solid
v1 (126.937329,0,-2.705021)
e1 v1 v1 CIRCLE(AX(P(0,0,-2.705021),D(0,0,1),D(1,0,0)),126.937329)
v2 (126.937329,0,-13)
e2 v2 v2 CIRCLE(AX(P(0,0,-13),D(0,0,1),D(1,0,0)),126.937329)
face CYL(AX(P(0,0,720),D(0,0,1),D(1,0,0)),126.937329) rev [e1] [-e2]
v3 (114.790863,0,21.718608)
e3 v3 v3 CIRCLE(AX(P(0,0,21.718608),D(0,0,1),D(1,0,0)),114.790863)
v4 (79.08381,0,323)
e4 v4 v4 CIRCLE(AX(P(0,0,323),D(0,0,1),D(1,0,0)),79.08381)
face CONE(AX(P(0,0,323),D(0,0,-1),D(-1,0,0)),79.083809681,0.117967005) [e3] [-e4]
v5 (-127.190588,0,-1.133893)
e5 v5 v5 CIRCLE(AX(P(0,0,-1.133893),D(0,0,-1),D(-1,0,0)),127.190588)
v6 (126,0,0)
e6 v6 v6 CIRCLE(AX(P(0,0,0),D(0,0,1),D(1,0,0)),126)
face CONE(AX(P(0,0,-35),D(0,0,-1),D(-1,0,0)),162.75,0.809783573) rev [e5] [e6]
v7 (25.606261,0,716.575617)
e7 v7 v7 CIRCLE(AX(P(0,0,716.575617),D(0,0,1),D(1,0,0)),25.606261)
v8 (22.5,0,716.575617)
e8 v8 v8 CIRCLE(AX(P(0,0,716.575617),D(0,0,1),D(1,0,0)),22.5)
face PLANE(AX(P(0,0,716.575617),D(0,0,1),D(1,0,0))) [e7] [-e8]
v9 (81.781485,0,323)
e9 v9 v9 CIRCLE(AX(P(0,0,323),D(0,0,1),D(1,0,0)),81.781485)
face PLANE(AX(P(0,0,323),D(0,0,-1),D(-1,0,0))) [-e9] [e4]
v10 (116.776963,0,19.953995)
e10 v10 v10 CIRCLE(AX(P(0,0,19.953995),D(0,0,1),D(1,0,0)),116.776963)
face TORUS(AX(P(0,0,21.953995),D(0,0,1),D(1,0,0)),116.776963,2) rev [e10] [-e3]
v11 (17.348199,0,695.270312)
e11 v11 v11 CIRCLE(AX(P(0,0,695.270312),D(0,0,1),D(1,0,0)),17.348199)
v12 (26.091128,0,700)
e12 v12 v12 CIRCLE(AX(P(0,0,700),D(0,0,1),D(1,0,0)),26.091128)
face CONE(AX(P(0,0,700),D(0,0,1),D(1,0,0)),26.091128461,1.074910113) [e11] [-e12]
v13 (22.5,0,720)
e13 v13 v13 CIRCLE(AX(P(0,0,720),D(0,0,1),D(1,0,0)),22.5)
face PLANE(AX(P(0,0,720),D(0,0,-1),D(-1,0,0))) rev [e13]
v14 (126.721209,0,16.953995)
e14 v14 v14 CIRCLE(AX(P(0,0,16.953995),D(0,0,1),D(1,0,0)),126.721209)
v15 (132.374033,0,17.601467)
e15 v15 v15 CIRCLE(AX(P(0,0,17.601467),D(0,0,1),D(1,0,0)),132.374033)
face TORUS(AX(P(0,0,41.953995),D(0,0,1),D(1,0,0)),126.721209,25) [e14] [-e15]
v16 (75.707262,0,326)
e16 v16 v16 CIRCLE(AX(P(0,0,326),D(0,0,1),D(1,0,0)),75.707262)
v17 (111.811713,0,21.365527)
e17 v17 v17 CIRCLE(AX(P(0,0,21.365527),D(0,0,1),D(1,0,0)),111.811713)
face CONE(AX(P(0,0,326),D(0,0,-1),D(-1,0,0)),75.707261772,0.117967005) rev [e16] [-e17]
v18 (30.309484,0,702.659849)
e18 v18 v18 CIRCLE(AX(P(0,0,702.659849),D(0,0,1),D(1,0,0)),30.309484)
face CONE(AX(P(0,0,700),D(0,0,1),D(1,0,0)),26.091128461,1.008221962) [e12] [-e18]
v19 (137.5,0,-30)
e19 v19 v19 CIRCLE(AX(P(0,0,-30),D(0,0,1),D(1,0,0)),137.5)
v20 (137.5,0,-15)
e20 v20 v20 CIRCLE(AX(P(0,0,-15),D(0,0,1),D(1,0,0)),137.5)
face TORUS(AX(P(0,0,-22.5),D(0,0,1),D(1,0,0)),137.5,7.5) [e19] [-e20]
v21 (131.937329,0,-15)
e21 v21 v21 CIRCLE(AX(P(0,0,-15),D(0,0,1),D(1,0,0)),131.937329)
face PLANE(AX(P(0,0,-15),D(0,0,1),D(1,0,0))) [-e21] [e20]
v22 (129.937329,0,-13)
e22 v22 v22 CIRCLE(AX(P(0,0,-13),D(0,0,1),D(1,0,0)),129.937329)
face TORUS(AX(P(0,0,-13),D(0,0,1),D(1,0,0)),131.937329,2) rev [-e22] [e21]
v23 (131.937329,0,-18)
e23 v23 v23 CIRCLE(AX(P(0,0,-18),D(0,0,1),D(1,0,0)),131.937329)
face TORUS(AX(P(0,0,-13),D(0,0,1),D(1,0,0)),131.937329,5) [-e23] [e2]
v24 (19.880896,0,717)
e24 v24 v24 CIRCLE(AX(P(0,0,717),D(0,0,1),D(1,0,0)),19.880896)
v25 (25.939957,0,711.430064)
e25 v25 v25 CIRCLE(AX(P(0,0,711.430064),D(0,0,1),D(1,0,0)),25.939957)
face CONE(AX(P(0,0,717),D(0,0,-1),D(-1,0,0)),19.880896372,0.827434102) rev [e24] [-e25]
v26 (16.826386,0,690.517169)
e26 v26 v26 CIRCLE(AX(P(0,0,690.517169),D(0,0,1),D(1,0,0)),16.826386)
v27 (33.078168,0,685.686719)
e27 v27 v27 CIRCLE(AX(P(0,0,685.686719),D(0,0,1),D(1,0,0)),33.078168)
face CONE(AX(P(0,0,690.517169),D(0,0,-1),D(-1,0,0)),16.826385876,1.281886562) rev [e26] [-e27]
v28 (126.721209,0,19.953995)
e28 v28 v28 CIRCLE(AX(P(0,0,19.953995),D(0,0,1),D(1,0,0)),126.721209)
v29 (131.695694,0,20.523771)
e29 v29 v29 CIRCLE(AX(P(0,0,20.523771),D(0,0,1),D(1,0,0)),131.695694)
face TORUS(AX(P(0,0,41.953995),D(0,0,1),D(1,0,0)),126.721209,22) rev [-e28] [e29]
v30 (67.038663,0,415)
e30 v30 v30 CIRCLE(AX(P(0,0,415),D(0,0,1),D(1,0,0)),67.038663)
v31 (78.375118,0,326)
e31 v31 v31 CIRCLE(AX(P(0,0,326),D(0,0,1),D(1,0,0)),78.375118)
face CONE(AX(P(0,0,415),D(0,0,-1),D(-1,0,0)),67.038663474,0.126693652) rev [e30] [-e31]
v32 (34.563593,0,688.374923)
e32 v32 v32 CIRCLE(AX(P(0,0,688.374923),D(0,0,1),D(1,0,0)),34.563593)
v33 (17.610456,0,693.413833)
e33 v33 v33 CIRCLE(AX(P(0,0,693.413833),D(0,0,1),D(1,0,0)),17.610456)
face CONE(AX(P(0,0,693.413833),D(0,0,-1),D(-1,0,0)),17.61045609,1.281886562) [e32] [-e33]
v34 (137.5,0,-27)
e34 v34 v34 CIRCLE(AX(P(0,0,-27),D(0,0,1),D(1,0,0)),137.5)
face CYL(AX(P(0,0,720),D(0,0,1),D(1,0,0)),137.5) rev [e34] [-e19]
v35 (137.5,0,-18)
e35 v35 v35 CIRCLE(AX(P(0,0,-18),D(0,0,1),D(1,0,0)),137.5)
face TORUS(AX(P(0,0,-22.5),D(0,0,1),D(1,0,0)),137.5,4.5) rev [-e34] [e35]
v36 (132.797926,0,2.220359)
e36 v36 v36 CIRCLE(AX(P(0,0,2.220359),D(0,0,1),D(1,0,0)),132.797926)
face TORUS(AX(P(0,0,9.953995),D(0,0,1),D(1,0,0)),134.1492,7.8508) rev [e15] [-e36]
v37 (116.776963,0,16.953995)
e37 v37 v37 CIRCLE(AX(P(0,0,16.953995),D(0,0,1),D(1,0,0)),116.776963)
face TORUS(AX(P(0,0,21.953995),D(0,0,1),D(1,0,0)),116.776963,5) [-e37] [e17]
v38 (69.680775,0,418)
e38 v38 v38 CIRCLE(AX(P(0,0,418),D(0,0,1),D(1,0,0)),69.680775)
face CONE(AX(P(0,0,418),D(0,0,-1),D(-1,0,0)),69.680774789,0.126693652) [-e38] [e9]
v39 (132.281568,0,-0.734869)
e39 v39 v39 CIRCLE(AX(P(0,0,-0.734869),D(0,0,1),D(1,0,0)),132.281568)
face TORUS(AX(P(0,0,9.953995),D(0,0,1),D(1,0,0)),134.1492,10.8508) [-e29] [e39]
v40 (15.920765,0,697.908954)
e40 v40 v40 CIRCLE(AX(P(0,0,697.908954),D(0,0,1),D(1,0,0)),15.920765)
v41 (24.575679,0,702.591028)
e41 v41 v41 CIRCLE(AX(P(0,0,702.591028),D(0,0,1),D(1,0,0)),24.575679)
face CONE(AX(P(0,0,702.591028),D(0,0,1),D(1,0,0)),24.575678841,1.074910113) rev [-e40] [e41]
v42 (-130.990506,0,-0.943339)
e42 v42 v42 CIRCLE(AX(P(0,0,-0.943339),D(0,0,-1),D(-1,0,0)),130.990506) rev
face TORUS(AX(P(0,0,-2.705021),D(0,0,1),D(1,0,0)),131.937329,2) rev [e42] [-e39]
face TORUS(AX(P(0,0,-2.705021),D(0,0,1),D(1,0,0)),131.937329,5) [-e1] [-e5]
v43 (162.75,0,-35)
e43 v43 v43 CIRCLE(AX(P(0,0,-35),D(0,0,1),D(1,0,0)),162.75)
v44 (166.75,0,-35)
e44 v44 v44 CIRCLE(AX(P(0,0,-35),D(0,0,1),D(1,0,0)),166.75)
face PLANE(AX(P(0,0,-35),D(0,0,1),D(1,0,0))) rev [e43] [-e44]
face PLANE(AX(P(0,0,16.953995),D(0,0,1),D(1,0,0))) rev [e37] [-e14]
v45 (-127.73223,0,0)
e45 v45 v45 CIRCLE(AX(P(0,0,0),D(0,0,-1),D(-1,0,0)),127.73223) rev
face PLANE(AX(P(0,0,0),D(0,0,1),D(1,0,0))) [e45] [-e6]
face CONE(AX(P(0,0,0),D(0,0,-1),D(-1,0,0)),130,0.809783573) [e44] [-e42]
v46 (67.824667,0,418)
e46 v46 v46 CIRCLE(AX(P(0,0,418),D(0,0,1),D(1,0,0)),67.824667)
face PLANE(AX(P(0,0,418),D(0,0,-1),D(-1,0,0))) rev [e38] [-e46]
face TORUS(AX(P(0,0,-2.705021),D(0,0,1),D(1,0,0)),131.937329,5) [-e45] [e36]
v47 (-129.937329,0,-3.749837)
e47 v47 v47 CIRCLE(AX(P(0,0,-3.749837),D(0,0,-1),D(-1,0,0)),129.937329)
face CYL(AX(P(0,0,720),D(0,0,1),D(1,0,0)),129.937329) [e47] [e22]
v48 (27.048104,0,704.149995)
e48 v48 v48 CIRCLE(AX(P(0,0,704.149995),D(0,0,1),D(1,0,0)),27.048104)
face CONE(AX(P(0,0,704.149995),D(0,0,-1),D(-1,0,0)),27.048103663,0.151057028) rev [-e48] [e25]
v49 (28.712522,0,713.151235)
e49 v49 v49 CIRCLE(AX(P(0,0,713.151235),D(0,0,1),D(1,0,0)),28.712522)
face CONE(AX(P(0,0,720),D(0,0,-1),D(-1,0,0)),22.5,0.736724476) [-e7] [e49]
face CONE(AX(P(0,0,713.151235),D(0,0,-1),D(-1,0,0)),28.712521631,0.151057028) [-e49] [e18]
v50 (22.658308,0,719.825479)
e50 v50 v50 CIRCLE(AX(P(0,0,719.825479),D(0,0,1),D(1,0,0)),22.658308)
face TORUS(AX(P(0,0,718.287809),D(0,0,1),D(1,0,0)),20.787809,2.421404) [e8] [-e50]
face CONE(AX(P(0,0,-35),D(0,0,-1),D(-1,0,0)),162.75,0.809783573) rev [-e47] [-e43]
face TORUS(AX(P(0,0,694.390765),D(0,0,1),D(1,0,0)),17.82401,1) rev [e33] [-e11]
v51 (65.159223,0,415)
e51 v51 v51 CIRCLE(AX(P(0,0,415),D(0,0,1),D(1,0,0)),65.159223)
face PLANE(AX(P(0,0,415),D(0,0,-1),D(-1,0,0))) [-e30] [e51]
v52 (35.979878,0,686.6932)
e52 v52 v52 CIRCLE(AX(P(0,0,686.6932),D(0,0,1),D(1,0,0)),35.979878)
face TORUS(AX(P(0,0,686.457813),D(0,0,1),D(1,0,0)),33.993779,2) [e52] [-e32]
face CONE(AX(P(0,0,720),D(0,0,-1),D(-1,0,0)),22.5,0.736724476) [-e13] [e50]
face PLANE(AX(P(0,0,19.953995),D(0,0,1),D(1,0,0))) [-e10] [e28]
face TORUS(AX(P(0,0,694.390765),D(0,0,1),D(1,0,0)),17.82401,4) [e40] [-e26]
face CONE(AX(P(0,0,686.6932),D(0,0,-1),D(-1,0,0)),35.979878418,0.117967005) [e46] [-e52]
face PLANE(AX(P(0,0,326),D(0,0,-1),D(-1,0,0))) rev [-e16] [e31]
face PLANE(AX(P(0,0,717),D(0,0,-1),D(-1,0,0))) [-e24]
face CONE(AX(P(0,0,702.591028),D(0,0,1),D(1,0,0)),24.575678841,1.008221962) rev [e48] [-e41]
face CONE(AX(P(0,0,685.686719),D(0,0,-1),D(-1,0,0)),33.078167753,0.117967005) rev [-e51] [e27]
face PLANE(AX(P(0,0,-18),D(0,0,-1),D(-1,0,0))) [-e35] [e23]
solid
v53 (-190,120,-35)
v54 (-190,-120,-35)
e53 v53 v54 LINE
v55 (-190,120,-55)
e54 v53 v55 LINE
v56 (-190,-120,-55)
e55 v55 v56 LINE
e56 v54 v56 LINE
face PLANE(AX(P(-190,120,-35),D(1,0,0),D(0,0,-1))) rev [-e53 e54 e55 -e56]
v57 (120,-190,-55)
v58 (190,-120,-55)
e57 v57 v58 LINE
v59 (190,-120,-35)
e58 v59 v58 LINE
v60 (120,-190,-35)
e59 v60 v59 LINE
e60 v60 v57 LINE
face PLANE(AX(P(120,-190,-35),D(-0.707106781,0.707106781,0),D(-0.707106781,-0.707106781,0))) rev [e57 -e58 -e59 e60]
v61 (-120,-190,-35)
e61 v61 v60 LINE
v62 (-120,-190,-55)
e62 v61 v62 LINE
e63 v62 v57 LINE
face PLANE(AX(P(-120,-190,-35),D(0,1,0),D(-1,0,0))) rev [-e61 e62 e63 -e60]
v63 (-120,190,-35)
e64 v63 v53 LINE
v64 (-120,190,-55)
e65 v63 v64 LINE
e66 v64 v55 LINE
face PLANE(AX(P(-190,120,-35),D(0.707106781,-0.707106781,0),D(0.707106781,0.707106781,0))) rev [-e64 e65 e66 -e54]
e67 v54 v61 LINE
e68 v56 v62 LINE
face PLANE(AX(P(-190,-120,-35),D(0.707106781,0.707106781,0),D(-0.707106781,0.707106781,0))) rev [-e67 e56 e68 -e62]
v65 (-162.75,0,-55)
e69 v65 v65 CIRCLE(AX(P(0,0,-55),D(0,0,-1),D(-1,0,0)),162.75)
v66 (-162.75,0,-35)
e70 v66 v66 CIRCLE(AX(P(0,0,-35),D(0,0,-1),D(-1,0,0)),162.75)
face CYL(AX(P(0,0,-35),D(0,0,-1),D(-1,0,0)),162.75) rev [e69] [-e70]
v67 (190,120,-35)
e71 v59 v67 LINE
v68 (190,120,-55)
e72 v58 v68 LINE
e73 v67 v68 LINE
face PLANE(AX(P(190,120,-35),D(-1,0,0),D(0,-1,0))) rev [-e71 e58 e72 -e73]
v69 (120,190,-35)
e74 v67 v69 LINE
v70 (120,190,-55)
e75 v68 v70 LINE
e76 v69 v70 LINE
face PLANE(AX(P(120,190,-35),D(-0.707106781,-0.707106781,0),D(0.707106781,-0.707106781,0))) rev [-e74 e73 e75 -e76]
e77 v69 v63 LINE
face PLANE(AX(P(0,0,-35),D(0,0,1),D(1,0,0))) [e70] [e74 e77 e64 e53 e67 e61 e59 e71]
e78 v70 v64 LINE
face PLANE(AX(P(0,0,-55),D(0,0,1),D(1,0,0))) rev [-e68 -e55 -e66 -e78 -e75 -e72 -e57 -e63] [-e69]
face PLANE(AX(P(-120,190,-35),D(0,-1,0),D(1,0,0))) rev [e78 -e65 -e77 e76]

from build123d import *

# Parameters (mm, degrees)
BOSS_EXTRUDE2_START = -55
BOSS_EXTRUDE2_DEPTH = 20
SKETCH3_R           = 130
CUT_EXTRUDE1_DEPTH  = 20
SKETCH9_R           = 162.75
CUT_EXTRUDE3_DEPTH  = 20


# Read off the part's stored shape, not the designer's step: Loft3
with BuildPart() as part:
    # Sketch1 → Boss-Extrude2 (new body)
    with BuildSketch(Plane.XY.offset(BOSS_EXTRUDE2_START)):
        Polygon((-190, -120), (-120, -190), (120, -190), (190, -120), (190, 120), (120, 190), (-120, 190), (-190, 120), align=None)
    extrude(amount=BOSS_EXTRUDE2_DEPTH)

    # Sketch3 → Cut-Extrude1 (cut)
    with BuildSketch(Plane.XY.offset(-35)):
        Circle(SKETCH3_R)
    extrude(amount=-CUT_EXTRUDE1_DEPTH, mode=Mode.SUBTRACT)

    # Sketch9 → Cut-Extrude3 (cut)
    with BuildSketch(Plane(origin=(0, 0, -55), x_dir=(-1, 0, 0), z_dir=(0, 0, -1))):
        Circle(SKETCH9_R)
    extrude(amount=-CUT_EXTRUDE3_DEPTH, mode=Mode.SUBTRACT)


with BuildPart() as body_2:
    # Loft3 outline → Loft3 (revolve)
    with BuildSketch(Plane.XZ):
        Polygon((0, 0), (0, -35), (166.75, -35), (130, 0), align=None)
    revolve(axis=Axis((0, 0, 0), (0, 0, 1)))

    # Sketch8 → Cut-Revolve1 (revolve, cut)
    with BuildSketch(Plane(origin=(0, 0, 0), x_dir=(0, 0, -1), z_dir=(1, 0, 0)), mode=Mode.PRIVATE) as cut_revolve1_sk:
        Polygon((0, 0), (35, 0), (35, 162.75), (0, 126), align=None)
    revolve(cut_revolve1_sk.sketch.rotate(Axis((0, 0, 0), (0, 0, -1)), 90), axis=Axis((0, 0, 0), (0, 0, -1)), mode=Mode.SUBTRACT)

    # Sketch18 → Revolve4 (revolve)
    with BuildSketch(Plane(origin=(0, 0, 0), x_dir=(0, 0, -1), z_dir=(1, 0, 0)), mode=Mode.PRIVATE) as revolve4_sk:
        with BuildLine():
            Line((-717, 0), (-717, 19.880896372))
            Line((-717, 19.880896372), (-711.430063707, 25.939956583))
            Line((-711.430063707, 25.939956583), (-704.149994744, 27.048103663))
            Line((-704.149994744, 27.048103663), (-702.591028043, 24.575678841))
            Line((-702.591028043, 24.575678841), (-697.908954114, 15.920764941))
            ThreePointArc((-697.908954114, 15.920764941), (-693.904332922, 13.853697296), (-690.5171686, 16.826385876))
            Line((-690.5171686, 16.826385876), (-685.686718887, 33.078167753))
            Line((-685.686718887, 33.078167753), (-415, 65.159223247))
            Line((-415, 65.159223247), (-415, 67.038663474))
            Line((-415, 67.038663474), (-326, 78.375118354))
            Line((-326, 78.375118354), (-326, 75.707261772))
            Line((-326, 75.707261772), (-21.365526799, 111.811713001))
            ThreePointArc((-21.365526799, 111.811713001), (-18.216191925, 113.455994535), (-16.953994733, 116.776962792))
            Line((-16.953994733, 116.776962792), (-16.953994733, 126.721209442))
            ThreePointArc((-16.953994733, 126.721209442), (-17.116390345, 129.56610105), (-17.601467394, 132.374032825))
            ThreePointArc((-17.601467394, 132.374032825), (-10.170275435, 141.99702029), (-2.220359419, 132.79792593))
            ThreePointArc((-2.220359419, 132.79792593), (-1.122705538, 128.720419572), (2.705021128, 126.937329357))
            Line((2.705021128, 126.937329357), (13, 126.937329357))
            ThreePointArc((13, 126.937329357), (16.535533906, 128.401795451), (18, 131.937329357))
            Line((18, 131.937329357), (18, 137.5))
            ThreePointArc((18, 137.5), (22.5, 142), (27, 137.5))
            Line((27, 137.5), (30, 137.5))
            ThreePointArc((30, 137.5), (22.5, 145), (15, 137.5))
            Line((15, 137.5), (15, 131.937329357))
            ThreePointArc((15, 131.937329357), (14.414213562, 130.523115794), (13, 129.937329357))
            Line((13, 129.937329357), (2.705021128, 129.937329357))
            ThreePointArc((2.705021128, 129.937329357), (1.173930462, 130.650565443), (0.734868909, 132.281567986))
            ThreePointArc((0.734868909, 132.281567986), (-10.252922059, 144.995881663), (-20.523770674, 131.695694019))
            ThreePointArc((-20.523770674, 131.695694019), (-20.096902871, 129.224714057), (-19.953994733, 126.721209442))
            Line((-19.953994733, 126.721209442), (-19.953994733, 116.776962792))
            ThreePointArc((-19.953994733, 116.776962792), (-20.45887361, 115.448575489), (-21.71860756, 114.790862876))
            Line((-21.71860756, 114.790862876), (-323, 79.083809681))
            Line((-323, 79.083809681), (-323, 81.781485054))
            Line((-323, 81.781485054), (-418, 69.680774789))
            Line((-418, 69.680774789), (-418, 67.824667435))
            Line((-418, 67.824667435), (-686.693199765, 35.979878418))
            ThreePointArc((-686.693199765, 35.979878418), (-687.746135964, 35.523557207), (-688.374922713, 34.563593191))
            Line((-688.374922713, 34.563593191), (-693.41383333, 17.61045609))
            ThreePointArc((-693.41383333, 17.61045609), (-694.250887422, 16.833841296), (-695.27031196, 17.348198856))
            Line((-695.27031196, 17.348198856), (-700, 26.091128461))
            Line((-700, 26.091128461), (-702.659848871, 30.309484353))
            Line((-702.659848871, 30.309484353), (-713.151234858, 28.712521631))
            Line((-713.151234858, 28.712521631), (-720, 22.5))
            Line((-720, 22.5), (-720, 0))
            Line((-720, 0), (-717, 0))
        make_face()
    revolve(revolve4_sk.sketch.rotate(Axis((0, 0, 720), (0, 0, -1)), 90), axis=Axis((0, 0, 720), (0, 0, -1)))

    # Sketch19 → Cut-Revolve2 (revolve, cut)
    with BuildSketch(Plane(origin=(0, 0, 0), x_dir=(0, 0, -1), z_dir=(1, 0, 0)), mode=Mode.PRIVATE) as cut_revolve2_sk:
        with BuildLine():
            ThreePointArc((-719.825479408, 22.658307802), (-718.169996579, 23.20634511), (-716.575617429, 22.5))
            Line((-716.575617429, 22.5), (-716.575617429, 25.606260816))
            Line((-716.575617429, 25.606260816), (-719.825479408, 22.658307802))
        make_face()
    revolve(cut_revolve2_sk.sketch.rotate(Axis((0, 0, 720), (0, 0, -1)), 90), axis=Axis((0, 0, 720), (0, 0, -1)), mode=Mode.SUBTRACT)


solid = Compound([part.part, body_2.part])
